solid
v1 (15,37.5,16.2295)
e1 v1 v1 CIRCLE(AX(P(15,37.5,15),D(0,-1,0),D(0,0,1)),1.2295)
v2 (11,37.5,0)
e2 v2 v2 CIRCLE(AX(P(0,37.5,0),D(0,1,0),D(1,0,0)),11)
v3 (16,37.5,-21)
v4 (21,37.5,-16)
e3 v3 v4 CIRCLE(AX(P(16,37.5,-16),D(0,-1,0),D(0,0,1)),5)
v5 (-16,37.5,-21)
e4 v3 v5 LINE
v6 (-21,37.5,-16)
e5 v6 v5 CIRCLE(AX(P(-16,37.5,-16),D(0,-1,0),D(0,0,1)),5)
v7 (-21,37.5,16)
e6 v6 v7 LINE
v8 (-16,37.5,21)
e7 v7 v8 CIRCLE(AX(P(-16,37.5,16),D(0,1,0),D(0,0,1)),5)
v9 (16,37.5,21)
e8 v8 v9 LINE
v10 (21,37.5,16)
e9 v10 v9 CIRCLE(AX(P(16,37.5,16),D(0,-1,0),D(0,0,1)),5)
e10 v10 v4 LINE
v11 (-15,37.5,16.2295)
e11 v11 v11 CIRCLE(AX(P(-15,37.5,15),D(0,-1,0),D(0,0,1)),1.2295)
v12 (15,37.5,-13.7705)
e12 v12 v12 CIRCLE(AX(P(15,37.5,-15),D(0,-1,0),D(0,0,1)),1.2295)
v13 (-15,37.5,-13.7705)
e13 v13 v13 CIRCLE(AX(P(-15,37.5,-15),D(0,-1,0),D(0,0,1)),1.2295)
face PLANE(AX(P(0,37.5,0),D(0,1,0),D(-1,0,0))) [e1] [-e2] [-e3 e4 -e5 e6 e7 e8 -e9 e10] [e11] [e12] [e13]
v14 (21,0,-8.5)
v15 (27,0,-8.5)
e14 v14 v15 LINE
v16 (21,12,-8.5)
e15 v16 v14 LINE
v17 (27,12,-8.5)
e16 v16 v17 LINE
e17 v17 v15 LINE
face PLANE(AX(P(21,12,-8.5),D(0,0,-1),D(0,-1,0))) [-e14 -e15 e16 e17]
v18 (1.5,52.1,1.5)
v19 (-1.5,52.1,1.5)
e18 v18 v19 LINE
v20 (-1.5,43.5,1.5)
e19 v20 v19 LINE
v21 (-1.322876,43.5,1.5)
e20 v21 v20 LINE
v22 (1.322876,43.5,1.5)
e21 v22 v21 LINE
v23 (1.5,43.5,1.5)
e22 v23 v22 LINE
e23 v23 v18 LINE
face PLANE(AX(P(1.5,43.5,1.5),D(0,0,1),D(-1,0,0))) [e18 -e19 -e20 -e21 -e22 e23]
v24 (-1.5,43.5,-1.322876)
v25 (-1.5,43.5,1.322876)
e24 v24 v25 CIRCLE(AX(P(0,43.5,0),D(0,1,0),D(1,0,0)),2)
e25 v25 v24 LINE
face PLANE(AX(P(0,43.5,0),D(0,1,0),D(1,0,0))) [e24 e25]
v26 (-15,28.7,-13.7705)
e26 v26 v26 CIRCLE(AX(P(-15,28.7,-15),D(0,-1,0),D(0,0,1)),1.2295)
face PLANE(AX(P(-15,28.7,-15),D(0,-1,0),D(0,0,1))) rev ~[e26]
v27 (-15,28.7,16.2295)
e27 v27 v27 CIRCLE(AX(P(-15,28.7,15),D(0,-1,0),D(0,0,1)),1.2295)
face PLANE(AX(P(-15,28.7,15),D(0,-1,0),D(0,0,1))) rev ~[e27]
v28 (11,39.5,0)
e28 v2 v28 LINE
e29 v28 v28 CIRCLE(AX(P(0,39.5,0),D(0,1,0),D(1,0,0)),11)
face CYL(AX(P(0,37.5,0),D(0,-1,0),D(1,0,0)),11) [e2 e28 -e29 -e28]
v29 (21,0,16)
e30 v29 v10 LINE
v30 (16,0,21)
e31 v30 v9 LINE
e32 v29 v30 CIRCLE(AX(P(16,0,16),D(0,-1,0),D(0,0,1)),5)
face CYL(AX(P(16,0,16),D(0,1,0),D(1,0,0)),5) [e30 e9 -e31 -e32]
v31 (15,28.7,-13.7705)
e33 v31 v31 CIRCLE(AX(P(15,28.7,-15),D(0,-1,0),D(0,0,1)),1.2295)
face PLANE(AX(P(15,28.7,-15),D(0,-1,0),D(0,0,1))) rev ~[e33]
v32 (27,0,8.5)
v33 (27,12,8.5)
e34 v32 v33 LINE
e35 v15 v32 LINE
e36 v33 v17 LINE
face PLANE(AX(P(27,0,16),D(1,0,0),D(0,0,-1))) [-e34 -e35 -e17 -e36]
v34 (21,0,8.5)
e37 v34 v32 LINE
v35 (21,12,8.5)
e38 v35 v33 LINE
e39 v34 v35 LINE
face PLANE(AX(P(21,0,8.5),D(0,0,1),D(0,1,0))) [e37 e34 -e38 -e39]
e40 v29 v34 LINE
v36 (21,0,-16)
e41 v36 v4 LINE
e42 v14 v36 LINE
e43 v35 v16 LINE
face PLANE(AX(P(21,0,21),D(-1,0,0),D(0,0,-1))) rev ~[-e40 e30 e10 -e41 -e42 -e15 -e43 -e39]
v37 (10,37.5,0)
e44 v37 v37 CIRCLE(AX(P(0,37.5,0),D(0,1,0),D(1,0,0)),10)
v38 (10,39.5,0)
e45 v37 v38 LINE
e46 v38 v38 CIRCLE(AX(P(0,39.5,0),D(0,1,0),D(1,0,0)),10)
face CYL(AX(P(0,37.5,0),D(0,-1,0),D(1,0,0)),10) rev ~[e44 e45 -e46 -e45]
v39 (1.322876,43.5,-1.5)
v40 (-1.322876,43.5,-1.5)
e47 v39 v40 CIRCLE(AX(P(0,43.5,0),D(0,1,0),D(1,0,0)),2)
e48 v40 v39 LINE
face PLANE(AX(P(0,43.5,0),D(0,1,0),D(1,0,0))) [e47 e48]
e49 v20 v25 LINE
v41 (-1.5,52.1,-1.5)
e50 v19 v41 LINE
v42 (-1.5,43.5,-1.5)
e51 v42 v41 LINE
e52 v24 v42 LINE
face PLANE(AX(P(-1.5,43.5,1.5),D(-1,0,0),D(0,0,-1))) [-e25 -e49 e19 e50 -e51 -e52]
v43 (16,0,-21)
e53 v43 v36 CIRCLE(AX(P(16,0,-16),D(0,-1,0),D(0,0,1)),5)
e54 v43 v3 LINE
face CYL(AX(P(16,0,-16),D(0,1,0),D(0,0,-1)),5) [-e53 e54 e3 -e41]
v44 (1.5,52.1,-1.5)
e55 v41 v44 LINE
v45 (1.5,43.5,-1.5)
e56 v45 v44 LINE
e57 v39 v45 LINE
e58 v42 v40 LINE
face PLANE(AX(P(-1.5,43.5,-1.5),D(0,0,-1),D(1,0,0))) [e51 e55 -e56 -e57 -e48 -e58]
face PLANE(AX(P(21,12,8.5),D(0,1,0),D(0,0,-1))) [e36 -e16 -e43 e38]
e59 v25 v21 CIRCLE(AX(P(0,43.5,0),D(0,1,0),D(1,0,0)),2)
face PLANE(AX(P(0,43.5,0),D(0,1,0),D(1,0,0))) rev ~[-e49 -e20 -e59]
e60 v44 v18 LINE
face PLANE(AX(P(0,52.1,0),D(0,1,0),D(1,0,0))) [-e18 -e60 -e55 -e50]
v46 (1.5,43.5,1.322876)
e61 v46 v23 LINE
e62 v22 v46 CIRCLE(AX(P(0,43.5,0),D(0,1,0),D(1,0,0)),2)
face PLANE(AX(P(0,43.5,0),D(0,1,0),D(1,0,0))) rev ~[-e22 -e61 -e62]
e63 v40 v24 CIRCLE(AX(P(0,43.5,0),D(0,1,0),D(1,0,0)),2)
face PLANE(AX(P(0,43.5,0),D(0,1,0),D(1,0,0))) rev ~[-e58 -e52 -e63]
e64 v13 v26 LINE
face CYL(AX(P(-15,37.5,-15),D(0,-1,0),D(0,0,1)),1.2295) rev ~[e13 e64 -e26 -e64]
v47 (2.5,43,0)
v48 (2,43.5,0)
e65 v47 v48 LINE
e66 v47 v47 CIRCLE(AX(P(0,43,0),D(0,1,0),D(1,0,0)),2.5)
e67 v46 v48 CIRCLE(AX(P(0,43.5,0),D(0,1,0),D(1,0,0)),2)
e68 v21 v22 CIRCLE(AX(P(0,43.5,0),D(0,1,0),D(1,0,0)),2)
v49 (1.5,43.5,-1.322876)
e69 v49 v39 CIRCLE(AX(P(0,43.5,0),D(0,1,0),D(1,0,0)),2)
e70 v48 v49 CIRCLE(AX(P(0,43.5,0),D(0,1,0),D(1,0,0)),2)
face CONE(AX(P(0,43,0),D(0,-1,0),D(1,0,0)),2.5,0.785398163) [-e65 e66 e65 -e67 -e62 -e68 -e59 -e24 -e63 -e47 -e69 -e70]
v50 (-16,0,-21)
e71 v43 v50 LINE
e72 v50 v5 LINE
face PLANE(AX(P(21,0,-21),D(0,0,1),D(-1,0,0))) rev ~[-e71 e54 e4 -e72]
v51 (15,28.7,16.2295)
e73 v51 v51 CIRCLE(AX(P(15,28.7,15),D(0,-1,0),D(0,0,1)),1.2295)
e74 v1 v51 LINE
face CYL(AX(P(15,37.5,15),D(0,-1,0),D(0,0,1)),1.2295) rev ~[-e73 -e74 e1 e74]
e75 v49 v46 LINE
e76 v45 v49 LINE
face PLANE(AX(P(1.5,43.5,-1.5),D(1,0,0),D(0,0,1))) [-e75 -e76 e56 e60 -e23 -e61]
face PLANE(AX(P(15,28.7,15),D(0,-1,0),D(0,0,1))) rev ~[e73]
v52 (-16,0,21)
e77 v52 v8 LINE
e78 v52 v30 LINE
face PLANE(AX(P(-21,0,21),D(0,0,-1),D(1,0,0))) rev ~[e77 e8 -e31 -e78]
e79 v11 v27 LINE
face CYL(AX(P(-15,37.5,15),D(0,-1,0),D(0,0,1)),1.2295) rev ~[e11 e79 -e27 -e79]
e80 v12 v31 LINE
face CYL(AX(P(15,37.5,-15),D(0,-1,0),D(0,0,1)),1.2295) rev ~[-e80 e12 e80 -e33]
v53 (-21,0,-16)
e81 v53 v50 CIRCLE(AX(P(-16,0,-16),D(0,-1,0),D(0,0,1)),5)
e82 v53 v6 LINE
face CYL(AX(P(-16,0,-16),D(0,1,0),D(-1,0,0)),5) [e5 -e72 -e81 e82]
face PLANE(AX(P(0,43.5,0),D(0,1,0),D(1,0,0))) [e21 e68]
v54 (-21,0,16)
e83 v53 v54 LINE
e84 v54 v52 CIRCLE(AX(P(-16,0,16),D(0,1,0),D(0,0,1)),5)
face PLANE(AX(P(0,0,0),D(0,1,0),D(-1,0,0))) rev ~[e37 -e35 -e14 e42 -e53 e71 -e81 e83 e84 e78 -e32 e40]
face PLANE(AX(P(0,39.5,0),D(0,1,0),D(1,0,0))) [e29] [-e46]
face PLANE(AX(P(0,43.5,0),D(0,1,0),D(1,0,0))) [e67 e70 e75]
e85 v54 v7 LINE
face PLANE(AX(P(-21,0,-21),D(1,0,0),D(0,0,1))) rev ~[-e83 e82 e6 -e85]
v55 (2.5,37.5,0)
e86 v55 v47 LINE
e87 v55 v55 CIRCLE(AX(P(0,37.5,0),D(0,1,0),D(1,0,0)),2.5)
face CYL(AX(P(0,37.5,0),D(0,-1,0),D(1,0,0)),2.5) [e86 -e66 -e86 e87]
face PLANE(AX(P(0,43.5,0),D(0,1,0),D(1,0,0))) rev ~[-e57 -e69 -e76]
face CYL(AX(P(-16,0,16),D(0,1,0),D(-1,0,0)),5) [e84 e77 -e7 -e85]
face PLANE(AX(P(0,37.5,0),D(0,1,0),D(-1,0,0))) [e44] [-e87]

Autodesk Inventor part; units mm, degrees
ref_plane "YZ Plane" through (0, 0, 0) normal (1, 0, 0) x (0, 1, 0)
ref_plane "XZ Plane" through (0, 0, 0) normal (0, 1, 0) x (-1, 0, 0)
ref_plane "XY Plane" through (0, 0, 0) normal (0, 0, 1) x (1, 0, 0)
sketch "Sketch1" plane through (0, 0, 0) normal (0, 1, 0) x (-1, 0, 0)
  line L0 (21, 21) -> (-21, 21)
  line L1 (-21, 21) -> (-21, -21)
  line L2 (-21, -21) -> (21, -21)
  line L3 (21, -21) -> (21, 21)
  line L4 (21, 21) -> (-21, -21) construction
  line L5 (-21, 21) -> (21, -21) construction
  point P0 (0, 0)
  dimension "d0" = 42
  dimension "d1" = 42
extrude "Extrusion1" add sketch "Sketch1" along normal blind 37.5
fillet "Fillet1" radius 5 4 edges at (21, 18.75, 21) (21, 18.75, -21) (-21, 18.75, -21) (-21, 18.75, 21)
sketch "Sketch2" plane through (0, 37.5, 0) normal (0, 1, 0) x (1, 0, 0)
  arc A0 (-21, -16) -> (-16, -21) centre (-16, -16) ccw projected
  line L0 (-16, -21) -> (16, -21) projected
  arc A1 (16, -21) -> (21, -16) centre (16, -16) ccw projected
  line L1 (21, -16) -> (21, 16) projected
  arc A2 (21, 16) -> (16, 21) centre (16, 16) ccw projected
  line L2 (16, 21) -> (-16, 21) projected
  arc A3 (-16, 21) -> (-21, 16) centre (-16, 16) ccw projected
  line L3 (-21, 16) -> (-21, -16) projected
  circle A4 centre (0, 0) radius 11
  circle A5 centre (0, 0) radius 10
  point P0 (-15, -15)
  point P1 (15, -15)
  point P2 (15, 15)
  point P3 (-15, 15)
  dimension "d5" = 22
  dimension "d6" = 20
  dimension "d7" = 6
  dimension "d8" = 6
  dimension "d11" = 360
extrude "Extrusion2" add sketch "Sketch2" along normal blind 2 contours A4
hole "Hole1" at (-15, 37.5, 15) at (15, 37.5, 15) at (15, 37.5, -15) at (-15, 37.5, -15) direction (0, -1, 0) diameter 2.459 depth 8.8 thread size "M3x0.5" class "6H" standard "ISO Metric profile"
sketch "Sketch3" plane through (0, 37.5, 0) normal (0, 1, 0) x (1, 0, 0)
  circle A0 centre (0, 0) radius 2.5
  dimension "d22" = 5
extrude "Extrusion3" add sketch "Sketch3" along normal blind 6
chamfer "Chamfer1" distance 0.5 angle 45 1 edges at (-2.5, 43.5, 0)
sketch "Sketch4" plane through (0, 43.5, 0) normal (0, 1, 0) x (1, 0, 0)
  line L0 (-1.5, 1.5) -> (1.5, 1.5)
  line L1 (1.5, 1.5) -> (1.5, -1.5)
  line L2 (1.5, -1.5) -> (-1.5, -1.5)
  line L3 (-1.5, -1.5) -> (-1.5, 1.5)
  line L4 (-1.5, 1.5) -> (1.5, -1.5) construction
  line L5 (1.5, 1.5) -> (-1.5, -1.5) construction
  point P0 (0, 0)
  dimension "d28" = 3
  dimension "d29" = 3
extrude "Extrusion4" add sketch "Sketch4" along normal blind 8.6
sketch "Sketch5" plane through (21, 0, 16) normal (1, 0, 0) x (0, 0, -1)
  line L0 (7.5, 12) -> (24.5, 12)
  line L1 (24.5, 12) -> (24.5, 0)
  line L2 (24.5, 0) -> (7.5, 0)
  line L3 (7.5, 0) -> (7.5, 12)
  line L4 (7.5, 12) -> (24.5, 0) construction
  line L5 (24.5, 12) -> (7.5, 0) construction
  line L6 (0, 0) -> (32, 0) projected
  point P0 (16, 0)
  point P1 (16, 6)
  point P2 (16, 0)
  dimension "d32" = 17
  dimension "d33" = 12
extrude "Extrusion5" add sketch "Sketch5" along normal blind 6
properties part number "steppeSquare"
